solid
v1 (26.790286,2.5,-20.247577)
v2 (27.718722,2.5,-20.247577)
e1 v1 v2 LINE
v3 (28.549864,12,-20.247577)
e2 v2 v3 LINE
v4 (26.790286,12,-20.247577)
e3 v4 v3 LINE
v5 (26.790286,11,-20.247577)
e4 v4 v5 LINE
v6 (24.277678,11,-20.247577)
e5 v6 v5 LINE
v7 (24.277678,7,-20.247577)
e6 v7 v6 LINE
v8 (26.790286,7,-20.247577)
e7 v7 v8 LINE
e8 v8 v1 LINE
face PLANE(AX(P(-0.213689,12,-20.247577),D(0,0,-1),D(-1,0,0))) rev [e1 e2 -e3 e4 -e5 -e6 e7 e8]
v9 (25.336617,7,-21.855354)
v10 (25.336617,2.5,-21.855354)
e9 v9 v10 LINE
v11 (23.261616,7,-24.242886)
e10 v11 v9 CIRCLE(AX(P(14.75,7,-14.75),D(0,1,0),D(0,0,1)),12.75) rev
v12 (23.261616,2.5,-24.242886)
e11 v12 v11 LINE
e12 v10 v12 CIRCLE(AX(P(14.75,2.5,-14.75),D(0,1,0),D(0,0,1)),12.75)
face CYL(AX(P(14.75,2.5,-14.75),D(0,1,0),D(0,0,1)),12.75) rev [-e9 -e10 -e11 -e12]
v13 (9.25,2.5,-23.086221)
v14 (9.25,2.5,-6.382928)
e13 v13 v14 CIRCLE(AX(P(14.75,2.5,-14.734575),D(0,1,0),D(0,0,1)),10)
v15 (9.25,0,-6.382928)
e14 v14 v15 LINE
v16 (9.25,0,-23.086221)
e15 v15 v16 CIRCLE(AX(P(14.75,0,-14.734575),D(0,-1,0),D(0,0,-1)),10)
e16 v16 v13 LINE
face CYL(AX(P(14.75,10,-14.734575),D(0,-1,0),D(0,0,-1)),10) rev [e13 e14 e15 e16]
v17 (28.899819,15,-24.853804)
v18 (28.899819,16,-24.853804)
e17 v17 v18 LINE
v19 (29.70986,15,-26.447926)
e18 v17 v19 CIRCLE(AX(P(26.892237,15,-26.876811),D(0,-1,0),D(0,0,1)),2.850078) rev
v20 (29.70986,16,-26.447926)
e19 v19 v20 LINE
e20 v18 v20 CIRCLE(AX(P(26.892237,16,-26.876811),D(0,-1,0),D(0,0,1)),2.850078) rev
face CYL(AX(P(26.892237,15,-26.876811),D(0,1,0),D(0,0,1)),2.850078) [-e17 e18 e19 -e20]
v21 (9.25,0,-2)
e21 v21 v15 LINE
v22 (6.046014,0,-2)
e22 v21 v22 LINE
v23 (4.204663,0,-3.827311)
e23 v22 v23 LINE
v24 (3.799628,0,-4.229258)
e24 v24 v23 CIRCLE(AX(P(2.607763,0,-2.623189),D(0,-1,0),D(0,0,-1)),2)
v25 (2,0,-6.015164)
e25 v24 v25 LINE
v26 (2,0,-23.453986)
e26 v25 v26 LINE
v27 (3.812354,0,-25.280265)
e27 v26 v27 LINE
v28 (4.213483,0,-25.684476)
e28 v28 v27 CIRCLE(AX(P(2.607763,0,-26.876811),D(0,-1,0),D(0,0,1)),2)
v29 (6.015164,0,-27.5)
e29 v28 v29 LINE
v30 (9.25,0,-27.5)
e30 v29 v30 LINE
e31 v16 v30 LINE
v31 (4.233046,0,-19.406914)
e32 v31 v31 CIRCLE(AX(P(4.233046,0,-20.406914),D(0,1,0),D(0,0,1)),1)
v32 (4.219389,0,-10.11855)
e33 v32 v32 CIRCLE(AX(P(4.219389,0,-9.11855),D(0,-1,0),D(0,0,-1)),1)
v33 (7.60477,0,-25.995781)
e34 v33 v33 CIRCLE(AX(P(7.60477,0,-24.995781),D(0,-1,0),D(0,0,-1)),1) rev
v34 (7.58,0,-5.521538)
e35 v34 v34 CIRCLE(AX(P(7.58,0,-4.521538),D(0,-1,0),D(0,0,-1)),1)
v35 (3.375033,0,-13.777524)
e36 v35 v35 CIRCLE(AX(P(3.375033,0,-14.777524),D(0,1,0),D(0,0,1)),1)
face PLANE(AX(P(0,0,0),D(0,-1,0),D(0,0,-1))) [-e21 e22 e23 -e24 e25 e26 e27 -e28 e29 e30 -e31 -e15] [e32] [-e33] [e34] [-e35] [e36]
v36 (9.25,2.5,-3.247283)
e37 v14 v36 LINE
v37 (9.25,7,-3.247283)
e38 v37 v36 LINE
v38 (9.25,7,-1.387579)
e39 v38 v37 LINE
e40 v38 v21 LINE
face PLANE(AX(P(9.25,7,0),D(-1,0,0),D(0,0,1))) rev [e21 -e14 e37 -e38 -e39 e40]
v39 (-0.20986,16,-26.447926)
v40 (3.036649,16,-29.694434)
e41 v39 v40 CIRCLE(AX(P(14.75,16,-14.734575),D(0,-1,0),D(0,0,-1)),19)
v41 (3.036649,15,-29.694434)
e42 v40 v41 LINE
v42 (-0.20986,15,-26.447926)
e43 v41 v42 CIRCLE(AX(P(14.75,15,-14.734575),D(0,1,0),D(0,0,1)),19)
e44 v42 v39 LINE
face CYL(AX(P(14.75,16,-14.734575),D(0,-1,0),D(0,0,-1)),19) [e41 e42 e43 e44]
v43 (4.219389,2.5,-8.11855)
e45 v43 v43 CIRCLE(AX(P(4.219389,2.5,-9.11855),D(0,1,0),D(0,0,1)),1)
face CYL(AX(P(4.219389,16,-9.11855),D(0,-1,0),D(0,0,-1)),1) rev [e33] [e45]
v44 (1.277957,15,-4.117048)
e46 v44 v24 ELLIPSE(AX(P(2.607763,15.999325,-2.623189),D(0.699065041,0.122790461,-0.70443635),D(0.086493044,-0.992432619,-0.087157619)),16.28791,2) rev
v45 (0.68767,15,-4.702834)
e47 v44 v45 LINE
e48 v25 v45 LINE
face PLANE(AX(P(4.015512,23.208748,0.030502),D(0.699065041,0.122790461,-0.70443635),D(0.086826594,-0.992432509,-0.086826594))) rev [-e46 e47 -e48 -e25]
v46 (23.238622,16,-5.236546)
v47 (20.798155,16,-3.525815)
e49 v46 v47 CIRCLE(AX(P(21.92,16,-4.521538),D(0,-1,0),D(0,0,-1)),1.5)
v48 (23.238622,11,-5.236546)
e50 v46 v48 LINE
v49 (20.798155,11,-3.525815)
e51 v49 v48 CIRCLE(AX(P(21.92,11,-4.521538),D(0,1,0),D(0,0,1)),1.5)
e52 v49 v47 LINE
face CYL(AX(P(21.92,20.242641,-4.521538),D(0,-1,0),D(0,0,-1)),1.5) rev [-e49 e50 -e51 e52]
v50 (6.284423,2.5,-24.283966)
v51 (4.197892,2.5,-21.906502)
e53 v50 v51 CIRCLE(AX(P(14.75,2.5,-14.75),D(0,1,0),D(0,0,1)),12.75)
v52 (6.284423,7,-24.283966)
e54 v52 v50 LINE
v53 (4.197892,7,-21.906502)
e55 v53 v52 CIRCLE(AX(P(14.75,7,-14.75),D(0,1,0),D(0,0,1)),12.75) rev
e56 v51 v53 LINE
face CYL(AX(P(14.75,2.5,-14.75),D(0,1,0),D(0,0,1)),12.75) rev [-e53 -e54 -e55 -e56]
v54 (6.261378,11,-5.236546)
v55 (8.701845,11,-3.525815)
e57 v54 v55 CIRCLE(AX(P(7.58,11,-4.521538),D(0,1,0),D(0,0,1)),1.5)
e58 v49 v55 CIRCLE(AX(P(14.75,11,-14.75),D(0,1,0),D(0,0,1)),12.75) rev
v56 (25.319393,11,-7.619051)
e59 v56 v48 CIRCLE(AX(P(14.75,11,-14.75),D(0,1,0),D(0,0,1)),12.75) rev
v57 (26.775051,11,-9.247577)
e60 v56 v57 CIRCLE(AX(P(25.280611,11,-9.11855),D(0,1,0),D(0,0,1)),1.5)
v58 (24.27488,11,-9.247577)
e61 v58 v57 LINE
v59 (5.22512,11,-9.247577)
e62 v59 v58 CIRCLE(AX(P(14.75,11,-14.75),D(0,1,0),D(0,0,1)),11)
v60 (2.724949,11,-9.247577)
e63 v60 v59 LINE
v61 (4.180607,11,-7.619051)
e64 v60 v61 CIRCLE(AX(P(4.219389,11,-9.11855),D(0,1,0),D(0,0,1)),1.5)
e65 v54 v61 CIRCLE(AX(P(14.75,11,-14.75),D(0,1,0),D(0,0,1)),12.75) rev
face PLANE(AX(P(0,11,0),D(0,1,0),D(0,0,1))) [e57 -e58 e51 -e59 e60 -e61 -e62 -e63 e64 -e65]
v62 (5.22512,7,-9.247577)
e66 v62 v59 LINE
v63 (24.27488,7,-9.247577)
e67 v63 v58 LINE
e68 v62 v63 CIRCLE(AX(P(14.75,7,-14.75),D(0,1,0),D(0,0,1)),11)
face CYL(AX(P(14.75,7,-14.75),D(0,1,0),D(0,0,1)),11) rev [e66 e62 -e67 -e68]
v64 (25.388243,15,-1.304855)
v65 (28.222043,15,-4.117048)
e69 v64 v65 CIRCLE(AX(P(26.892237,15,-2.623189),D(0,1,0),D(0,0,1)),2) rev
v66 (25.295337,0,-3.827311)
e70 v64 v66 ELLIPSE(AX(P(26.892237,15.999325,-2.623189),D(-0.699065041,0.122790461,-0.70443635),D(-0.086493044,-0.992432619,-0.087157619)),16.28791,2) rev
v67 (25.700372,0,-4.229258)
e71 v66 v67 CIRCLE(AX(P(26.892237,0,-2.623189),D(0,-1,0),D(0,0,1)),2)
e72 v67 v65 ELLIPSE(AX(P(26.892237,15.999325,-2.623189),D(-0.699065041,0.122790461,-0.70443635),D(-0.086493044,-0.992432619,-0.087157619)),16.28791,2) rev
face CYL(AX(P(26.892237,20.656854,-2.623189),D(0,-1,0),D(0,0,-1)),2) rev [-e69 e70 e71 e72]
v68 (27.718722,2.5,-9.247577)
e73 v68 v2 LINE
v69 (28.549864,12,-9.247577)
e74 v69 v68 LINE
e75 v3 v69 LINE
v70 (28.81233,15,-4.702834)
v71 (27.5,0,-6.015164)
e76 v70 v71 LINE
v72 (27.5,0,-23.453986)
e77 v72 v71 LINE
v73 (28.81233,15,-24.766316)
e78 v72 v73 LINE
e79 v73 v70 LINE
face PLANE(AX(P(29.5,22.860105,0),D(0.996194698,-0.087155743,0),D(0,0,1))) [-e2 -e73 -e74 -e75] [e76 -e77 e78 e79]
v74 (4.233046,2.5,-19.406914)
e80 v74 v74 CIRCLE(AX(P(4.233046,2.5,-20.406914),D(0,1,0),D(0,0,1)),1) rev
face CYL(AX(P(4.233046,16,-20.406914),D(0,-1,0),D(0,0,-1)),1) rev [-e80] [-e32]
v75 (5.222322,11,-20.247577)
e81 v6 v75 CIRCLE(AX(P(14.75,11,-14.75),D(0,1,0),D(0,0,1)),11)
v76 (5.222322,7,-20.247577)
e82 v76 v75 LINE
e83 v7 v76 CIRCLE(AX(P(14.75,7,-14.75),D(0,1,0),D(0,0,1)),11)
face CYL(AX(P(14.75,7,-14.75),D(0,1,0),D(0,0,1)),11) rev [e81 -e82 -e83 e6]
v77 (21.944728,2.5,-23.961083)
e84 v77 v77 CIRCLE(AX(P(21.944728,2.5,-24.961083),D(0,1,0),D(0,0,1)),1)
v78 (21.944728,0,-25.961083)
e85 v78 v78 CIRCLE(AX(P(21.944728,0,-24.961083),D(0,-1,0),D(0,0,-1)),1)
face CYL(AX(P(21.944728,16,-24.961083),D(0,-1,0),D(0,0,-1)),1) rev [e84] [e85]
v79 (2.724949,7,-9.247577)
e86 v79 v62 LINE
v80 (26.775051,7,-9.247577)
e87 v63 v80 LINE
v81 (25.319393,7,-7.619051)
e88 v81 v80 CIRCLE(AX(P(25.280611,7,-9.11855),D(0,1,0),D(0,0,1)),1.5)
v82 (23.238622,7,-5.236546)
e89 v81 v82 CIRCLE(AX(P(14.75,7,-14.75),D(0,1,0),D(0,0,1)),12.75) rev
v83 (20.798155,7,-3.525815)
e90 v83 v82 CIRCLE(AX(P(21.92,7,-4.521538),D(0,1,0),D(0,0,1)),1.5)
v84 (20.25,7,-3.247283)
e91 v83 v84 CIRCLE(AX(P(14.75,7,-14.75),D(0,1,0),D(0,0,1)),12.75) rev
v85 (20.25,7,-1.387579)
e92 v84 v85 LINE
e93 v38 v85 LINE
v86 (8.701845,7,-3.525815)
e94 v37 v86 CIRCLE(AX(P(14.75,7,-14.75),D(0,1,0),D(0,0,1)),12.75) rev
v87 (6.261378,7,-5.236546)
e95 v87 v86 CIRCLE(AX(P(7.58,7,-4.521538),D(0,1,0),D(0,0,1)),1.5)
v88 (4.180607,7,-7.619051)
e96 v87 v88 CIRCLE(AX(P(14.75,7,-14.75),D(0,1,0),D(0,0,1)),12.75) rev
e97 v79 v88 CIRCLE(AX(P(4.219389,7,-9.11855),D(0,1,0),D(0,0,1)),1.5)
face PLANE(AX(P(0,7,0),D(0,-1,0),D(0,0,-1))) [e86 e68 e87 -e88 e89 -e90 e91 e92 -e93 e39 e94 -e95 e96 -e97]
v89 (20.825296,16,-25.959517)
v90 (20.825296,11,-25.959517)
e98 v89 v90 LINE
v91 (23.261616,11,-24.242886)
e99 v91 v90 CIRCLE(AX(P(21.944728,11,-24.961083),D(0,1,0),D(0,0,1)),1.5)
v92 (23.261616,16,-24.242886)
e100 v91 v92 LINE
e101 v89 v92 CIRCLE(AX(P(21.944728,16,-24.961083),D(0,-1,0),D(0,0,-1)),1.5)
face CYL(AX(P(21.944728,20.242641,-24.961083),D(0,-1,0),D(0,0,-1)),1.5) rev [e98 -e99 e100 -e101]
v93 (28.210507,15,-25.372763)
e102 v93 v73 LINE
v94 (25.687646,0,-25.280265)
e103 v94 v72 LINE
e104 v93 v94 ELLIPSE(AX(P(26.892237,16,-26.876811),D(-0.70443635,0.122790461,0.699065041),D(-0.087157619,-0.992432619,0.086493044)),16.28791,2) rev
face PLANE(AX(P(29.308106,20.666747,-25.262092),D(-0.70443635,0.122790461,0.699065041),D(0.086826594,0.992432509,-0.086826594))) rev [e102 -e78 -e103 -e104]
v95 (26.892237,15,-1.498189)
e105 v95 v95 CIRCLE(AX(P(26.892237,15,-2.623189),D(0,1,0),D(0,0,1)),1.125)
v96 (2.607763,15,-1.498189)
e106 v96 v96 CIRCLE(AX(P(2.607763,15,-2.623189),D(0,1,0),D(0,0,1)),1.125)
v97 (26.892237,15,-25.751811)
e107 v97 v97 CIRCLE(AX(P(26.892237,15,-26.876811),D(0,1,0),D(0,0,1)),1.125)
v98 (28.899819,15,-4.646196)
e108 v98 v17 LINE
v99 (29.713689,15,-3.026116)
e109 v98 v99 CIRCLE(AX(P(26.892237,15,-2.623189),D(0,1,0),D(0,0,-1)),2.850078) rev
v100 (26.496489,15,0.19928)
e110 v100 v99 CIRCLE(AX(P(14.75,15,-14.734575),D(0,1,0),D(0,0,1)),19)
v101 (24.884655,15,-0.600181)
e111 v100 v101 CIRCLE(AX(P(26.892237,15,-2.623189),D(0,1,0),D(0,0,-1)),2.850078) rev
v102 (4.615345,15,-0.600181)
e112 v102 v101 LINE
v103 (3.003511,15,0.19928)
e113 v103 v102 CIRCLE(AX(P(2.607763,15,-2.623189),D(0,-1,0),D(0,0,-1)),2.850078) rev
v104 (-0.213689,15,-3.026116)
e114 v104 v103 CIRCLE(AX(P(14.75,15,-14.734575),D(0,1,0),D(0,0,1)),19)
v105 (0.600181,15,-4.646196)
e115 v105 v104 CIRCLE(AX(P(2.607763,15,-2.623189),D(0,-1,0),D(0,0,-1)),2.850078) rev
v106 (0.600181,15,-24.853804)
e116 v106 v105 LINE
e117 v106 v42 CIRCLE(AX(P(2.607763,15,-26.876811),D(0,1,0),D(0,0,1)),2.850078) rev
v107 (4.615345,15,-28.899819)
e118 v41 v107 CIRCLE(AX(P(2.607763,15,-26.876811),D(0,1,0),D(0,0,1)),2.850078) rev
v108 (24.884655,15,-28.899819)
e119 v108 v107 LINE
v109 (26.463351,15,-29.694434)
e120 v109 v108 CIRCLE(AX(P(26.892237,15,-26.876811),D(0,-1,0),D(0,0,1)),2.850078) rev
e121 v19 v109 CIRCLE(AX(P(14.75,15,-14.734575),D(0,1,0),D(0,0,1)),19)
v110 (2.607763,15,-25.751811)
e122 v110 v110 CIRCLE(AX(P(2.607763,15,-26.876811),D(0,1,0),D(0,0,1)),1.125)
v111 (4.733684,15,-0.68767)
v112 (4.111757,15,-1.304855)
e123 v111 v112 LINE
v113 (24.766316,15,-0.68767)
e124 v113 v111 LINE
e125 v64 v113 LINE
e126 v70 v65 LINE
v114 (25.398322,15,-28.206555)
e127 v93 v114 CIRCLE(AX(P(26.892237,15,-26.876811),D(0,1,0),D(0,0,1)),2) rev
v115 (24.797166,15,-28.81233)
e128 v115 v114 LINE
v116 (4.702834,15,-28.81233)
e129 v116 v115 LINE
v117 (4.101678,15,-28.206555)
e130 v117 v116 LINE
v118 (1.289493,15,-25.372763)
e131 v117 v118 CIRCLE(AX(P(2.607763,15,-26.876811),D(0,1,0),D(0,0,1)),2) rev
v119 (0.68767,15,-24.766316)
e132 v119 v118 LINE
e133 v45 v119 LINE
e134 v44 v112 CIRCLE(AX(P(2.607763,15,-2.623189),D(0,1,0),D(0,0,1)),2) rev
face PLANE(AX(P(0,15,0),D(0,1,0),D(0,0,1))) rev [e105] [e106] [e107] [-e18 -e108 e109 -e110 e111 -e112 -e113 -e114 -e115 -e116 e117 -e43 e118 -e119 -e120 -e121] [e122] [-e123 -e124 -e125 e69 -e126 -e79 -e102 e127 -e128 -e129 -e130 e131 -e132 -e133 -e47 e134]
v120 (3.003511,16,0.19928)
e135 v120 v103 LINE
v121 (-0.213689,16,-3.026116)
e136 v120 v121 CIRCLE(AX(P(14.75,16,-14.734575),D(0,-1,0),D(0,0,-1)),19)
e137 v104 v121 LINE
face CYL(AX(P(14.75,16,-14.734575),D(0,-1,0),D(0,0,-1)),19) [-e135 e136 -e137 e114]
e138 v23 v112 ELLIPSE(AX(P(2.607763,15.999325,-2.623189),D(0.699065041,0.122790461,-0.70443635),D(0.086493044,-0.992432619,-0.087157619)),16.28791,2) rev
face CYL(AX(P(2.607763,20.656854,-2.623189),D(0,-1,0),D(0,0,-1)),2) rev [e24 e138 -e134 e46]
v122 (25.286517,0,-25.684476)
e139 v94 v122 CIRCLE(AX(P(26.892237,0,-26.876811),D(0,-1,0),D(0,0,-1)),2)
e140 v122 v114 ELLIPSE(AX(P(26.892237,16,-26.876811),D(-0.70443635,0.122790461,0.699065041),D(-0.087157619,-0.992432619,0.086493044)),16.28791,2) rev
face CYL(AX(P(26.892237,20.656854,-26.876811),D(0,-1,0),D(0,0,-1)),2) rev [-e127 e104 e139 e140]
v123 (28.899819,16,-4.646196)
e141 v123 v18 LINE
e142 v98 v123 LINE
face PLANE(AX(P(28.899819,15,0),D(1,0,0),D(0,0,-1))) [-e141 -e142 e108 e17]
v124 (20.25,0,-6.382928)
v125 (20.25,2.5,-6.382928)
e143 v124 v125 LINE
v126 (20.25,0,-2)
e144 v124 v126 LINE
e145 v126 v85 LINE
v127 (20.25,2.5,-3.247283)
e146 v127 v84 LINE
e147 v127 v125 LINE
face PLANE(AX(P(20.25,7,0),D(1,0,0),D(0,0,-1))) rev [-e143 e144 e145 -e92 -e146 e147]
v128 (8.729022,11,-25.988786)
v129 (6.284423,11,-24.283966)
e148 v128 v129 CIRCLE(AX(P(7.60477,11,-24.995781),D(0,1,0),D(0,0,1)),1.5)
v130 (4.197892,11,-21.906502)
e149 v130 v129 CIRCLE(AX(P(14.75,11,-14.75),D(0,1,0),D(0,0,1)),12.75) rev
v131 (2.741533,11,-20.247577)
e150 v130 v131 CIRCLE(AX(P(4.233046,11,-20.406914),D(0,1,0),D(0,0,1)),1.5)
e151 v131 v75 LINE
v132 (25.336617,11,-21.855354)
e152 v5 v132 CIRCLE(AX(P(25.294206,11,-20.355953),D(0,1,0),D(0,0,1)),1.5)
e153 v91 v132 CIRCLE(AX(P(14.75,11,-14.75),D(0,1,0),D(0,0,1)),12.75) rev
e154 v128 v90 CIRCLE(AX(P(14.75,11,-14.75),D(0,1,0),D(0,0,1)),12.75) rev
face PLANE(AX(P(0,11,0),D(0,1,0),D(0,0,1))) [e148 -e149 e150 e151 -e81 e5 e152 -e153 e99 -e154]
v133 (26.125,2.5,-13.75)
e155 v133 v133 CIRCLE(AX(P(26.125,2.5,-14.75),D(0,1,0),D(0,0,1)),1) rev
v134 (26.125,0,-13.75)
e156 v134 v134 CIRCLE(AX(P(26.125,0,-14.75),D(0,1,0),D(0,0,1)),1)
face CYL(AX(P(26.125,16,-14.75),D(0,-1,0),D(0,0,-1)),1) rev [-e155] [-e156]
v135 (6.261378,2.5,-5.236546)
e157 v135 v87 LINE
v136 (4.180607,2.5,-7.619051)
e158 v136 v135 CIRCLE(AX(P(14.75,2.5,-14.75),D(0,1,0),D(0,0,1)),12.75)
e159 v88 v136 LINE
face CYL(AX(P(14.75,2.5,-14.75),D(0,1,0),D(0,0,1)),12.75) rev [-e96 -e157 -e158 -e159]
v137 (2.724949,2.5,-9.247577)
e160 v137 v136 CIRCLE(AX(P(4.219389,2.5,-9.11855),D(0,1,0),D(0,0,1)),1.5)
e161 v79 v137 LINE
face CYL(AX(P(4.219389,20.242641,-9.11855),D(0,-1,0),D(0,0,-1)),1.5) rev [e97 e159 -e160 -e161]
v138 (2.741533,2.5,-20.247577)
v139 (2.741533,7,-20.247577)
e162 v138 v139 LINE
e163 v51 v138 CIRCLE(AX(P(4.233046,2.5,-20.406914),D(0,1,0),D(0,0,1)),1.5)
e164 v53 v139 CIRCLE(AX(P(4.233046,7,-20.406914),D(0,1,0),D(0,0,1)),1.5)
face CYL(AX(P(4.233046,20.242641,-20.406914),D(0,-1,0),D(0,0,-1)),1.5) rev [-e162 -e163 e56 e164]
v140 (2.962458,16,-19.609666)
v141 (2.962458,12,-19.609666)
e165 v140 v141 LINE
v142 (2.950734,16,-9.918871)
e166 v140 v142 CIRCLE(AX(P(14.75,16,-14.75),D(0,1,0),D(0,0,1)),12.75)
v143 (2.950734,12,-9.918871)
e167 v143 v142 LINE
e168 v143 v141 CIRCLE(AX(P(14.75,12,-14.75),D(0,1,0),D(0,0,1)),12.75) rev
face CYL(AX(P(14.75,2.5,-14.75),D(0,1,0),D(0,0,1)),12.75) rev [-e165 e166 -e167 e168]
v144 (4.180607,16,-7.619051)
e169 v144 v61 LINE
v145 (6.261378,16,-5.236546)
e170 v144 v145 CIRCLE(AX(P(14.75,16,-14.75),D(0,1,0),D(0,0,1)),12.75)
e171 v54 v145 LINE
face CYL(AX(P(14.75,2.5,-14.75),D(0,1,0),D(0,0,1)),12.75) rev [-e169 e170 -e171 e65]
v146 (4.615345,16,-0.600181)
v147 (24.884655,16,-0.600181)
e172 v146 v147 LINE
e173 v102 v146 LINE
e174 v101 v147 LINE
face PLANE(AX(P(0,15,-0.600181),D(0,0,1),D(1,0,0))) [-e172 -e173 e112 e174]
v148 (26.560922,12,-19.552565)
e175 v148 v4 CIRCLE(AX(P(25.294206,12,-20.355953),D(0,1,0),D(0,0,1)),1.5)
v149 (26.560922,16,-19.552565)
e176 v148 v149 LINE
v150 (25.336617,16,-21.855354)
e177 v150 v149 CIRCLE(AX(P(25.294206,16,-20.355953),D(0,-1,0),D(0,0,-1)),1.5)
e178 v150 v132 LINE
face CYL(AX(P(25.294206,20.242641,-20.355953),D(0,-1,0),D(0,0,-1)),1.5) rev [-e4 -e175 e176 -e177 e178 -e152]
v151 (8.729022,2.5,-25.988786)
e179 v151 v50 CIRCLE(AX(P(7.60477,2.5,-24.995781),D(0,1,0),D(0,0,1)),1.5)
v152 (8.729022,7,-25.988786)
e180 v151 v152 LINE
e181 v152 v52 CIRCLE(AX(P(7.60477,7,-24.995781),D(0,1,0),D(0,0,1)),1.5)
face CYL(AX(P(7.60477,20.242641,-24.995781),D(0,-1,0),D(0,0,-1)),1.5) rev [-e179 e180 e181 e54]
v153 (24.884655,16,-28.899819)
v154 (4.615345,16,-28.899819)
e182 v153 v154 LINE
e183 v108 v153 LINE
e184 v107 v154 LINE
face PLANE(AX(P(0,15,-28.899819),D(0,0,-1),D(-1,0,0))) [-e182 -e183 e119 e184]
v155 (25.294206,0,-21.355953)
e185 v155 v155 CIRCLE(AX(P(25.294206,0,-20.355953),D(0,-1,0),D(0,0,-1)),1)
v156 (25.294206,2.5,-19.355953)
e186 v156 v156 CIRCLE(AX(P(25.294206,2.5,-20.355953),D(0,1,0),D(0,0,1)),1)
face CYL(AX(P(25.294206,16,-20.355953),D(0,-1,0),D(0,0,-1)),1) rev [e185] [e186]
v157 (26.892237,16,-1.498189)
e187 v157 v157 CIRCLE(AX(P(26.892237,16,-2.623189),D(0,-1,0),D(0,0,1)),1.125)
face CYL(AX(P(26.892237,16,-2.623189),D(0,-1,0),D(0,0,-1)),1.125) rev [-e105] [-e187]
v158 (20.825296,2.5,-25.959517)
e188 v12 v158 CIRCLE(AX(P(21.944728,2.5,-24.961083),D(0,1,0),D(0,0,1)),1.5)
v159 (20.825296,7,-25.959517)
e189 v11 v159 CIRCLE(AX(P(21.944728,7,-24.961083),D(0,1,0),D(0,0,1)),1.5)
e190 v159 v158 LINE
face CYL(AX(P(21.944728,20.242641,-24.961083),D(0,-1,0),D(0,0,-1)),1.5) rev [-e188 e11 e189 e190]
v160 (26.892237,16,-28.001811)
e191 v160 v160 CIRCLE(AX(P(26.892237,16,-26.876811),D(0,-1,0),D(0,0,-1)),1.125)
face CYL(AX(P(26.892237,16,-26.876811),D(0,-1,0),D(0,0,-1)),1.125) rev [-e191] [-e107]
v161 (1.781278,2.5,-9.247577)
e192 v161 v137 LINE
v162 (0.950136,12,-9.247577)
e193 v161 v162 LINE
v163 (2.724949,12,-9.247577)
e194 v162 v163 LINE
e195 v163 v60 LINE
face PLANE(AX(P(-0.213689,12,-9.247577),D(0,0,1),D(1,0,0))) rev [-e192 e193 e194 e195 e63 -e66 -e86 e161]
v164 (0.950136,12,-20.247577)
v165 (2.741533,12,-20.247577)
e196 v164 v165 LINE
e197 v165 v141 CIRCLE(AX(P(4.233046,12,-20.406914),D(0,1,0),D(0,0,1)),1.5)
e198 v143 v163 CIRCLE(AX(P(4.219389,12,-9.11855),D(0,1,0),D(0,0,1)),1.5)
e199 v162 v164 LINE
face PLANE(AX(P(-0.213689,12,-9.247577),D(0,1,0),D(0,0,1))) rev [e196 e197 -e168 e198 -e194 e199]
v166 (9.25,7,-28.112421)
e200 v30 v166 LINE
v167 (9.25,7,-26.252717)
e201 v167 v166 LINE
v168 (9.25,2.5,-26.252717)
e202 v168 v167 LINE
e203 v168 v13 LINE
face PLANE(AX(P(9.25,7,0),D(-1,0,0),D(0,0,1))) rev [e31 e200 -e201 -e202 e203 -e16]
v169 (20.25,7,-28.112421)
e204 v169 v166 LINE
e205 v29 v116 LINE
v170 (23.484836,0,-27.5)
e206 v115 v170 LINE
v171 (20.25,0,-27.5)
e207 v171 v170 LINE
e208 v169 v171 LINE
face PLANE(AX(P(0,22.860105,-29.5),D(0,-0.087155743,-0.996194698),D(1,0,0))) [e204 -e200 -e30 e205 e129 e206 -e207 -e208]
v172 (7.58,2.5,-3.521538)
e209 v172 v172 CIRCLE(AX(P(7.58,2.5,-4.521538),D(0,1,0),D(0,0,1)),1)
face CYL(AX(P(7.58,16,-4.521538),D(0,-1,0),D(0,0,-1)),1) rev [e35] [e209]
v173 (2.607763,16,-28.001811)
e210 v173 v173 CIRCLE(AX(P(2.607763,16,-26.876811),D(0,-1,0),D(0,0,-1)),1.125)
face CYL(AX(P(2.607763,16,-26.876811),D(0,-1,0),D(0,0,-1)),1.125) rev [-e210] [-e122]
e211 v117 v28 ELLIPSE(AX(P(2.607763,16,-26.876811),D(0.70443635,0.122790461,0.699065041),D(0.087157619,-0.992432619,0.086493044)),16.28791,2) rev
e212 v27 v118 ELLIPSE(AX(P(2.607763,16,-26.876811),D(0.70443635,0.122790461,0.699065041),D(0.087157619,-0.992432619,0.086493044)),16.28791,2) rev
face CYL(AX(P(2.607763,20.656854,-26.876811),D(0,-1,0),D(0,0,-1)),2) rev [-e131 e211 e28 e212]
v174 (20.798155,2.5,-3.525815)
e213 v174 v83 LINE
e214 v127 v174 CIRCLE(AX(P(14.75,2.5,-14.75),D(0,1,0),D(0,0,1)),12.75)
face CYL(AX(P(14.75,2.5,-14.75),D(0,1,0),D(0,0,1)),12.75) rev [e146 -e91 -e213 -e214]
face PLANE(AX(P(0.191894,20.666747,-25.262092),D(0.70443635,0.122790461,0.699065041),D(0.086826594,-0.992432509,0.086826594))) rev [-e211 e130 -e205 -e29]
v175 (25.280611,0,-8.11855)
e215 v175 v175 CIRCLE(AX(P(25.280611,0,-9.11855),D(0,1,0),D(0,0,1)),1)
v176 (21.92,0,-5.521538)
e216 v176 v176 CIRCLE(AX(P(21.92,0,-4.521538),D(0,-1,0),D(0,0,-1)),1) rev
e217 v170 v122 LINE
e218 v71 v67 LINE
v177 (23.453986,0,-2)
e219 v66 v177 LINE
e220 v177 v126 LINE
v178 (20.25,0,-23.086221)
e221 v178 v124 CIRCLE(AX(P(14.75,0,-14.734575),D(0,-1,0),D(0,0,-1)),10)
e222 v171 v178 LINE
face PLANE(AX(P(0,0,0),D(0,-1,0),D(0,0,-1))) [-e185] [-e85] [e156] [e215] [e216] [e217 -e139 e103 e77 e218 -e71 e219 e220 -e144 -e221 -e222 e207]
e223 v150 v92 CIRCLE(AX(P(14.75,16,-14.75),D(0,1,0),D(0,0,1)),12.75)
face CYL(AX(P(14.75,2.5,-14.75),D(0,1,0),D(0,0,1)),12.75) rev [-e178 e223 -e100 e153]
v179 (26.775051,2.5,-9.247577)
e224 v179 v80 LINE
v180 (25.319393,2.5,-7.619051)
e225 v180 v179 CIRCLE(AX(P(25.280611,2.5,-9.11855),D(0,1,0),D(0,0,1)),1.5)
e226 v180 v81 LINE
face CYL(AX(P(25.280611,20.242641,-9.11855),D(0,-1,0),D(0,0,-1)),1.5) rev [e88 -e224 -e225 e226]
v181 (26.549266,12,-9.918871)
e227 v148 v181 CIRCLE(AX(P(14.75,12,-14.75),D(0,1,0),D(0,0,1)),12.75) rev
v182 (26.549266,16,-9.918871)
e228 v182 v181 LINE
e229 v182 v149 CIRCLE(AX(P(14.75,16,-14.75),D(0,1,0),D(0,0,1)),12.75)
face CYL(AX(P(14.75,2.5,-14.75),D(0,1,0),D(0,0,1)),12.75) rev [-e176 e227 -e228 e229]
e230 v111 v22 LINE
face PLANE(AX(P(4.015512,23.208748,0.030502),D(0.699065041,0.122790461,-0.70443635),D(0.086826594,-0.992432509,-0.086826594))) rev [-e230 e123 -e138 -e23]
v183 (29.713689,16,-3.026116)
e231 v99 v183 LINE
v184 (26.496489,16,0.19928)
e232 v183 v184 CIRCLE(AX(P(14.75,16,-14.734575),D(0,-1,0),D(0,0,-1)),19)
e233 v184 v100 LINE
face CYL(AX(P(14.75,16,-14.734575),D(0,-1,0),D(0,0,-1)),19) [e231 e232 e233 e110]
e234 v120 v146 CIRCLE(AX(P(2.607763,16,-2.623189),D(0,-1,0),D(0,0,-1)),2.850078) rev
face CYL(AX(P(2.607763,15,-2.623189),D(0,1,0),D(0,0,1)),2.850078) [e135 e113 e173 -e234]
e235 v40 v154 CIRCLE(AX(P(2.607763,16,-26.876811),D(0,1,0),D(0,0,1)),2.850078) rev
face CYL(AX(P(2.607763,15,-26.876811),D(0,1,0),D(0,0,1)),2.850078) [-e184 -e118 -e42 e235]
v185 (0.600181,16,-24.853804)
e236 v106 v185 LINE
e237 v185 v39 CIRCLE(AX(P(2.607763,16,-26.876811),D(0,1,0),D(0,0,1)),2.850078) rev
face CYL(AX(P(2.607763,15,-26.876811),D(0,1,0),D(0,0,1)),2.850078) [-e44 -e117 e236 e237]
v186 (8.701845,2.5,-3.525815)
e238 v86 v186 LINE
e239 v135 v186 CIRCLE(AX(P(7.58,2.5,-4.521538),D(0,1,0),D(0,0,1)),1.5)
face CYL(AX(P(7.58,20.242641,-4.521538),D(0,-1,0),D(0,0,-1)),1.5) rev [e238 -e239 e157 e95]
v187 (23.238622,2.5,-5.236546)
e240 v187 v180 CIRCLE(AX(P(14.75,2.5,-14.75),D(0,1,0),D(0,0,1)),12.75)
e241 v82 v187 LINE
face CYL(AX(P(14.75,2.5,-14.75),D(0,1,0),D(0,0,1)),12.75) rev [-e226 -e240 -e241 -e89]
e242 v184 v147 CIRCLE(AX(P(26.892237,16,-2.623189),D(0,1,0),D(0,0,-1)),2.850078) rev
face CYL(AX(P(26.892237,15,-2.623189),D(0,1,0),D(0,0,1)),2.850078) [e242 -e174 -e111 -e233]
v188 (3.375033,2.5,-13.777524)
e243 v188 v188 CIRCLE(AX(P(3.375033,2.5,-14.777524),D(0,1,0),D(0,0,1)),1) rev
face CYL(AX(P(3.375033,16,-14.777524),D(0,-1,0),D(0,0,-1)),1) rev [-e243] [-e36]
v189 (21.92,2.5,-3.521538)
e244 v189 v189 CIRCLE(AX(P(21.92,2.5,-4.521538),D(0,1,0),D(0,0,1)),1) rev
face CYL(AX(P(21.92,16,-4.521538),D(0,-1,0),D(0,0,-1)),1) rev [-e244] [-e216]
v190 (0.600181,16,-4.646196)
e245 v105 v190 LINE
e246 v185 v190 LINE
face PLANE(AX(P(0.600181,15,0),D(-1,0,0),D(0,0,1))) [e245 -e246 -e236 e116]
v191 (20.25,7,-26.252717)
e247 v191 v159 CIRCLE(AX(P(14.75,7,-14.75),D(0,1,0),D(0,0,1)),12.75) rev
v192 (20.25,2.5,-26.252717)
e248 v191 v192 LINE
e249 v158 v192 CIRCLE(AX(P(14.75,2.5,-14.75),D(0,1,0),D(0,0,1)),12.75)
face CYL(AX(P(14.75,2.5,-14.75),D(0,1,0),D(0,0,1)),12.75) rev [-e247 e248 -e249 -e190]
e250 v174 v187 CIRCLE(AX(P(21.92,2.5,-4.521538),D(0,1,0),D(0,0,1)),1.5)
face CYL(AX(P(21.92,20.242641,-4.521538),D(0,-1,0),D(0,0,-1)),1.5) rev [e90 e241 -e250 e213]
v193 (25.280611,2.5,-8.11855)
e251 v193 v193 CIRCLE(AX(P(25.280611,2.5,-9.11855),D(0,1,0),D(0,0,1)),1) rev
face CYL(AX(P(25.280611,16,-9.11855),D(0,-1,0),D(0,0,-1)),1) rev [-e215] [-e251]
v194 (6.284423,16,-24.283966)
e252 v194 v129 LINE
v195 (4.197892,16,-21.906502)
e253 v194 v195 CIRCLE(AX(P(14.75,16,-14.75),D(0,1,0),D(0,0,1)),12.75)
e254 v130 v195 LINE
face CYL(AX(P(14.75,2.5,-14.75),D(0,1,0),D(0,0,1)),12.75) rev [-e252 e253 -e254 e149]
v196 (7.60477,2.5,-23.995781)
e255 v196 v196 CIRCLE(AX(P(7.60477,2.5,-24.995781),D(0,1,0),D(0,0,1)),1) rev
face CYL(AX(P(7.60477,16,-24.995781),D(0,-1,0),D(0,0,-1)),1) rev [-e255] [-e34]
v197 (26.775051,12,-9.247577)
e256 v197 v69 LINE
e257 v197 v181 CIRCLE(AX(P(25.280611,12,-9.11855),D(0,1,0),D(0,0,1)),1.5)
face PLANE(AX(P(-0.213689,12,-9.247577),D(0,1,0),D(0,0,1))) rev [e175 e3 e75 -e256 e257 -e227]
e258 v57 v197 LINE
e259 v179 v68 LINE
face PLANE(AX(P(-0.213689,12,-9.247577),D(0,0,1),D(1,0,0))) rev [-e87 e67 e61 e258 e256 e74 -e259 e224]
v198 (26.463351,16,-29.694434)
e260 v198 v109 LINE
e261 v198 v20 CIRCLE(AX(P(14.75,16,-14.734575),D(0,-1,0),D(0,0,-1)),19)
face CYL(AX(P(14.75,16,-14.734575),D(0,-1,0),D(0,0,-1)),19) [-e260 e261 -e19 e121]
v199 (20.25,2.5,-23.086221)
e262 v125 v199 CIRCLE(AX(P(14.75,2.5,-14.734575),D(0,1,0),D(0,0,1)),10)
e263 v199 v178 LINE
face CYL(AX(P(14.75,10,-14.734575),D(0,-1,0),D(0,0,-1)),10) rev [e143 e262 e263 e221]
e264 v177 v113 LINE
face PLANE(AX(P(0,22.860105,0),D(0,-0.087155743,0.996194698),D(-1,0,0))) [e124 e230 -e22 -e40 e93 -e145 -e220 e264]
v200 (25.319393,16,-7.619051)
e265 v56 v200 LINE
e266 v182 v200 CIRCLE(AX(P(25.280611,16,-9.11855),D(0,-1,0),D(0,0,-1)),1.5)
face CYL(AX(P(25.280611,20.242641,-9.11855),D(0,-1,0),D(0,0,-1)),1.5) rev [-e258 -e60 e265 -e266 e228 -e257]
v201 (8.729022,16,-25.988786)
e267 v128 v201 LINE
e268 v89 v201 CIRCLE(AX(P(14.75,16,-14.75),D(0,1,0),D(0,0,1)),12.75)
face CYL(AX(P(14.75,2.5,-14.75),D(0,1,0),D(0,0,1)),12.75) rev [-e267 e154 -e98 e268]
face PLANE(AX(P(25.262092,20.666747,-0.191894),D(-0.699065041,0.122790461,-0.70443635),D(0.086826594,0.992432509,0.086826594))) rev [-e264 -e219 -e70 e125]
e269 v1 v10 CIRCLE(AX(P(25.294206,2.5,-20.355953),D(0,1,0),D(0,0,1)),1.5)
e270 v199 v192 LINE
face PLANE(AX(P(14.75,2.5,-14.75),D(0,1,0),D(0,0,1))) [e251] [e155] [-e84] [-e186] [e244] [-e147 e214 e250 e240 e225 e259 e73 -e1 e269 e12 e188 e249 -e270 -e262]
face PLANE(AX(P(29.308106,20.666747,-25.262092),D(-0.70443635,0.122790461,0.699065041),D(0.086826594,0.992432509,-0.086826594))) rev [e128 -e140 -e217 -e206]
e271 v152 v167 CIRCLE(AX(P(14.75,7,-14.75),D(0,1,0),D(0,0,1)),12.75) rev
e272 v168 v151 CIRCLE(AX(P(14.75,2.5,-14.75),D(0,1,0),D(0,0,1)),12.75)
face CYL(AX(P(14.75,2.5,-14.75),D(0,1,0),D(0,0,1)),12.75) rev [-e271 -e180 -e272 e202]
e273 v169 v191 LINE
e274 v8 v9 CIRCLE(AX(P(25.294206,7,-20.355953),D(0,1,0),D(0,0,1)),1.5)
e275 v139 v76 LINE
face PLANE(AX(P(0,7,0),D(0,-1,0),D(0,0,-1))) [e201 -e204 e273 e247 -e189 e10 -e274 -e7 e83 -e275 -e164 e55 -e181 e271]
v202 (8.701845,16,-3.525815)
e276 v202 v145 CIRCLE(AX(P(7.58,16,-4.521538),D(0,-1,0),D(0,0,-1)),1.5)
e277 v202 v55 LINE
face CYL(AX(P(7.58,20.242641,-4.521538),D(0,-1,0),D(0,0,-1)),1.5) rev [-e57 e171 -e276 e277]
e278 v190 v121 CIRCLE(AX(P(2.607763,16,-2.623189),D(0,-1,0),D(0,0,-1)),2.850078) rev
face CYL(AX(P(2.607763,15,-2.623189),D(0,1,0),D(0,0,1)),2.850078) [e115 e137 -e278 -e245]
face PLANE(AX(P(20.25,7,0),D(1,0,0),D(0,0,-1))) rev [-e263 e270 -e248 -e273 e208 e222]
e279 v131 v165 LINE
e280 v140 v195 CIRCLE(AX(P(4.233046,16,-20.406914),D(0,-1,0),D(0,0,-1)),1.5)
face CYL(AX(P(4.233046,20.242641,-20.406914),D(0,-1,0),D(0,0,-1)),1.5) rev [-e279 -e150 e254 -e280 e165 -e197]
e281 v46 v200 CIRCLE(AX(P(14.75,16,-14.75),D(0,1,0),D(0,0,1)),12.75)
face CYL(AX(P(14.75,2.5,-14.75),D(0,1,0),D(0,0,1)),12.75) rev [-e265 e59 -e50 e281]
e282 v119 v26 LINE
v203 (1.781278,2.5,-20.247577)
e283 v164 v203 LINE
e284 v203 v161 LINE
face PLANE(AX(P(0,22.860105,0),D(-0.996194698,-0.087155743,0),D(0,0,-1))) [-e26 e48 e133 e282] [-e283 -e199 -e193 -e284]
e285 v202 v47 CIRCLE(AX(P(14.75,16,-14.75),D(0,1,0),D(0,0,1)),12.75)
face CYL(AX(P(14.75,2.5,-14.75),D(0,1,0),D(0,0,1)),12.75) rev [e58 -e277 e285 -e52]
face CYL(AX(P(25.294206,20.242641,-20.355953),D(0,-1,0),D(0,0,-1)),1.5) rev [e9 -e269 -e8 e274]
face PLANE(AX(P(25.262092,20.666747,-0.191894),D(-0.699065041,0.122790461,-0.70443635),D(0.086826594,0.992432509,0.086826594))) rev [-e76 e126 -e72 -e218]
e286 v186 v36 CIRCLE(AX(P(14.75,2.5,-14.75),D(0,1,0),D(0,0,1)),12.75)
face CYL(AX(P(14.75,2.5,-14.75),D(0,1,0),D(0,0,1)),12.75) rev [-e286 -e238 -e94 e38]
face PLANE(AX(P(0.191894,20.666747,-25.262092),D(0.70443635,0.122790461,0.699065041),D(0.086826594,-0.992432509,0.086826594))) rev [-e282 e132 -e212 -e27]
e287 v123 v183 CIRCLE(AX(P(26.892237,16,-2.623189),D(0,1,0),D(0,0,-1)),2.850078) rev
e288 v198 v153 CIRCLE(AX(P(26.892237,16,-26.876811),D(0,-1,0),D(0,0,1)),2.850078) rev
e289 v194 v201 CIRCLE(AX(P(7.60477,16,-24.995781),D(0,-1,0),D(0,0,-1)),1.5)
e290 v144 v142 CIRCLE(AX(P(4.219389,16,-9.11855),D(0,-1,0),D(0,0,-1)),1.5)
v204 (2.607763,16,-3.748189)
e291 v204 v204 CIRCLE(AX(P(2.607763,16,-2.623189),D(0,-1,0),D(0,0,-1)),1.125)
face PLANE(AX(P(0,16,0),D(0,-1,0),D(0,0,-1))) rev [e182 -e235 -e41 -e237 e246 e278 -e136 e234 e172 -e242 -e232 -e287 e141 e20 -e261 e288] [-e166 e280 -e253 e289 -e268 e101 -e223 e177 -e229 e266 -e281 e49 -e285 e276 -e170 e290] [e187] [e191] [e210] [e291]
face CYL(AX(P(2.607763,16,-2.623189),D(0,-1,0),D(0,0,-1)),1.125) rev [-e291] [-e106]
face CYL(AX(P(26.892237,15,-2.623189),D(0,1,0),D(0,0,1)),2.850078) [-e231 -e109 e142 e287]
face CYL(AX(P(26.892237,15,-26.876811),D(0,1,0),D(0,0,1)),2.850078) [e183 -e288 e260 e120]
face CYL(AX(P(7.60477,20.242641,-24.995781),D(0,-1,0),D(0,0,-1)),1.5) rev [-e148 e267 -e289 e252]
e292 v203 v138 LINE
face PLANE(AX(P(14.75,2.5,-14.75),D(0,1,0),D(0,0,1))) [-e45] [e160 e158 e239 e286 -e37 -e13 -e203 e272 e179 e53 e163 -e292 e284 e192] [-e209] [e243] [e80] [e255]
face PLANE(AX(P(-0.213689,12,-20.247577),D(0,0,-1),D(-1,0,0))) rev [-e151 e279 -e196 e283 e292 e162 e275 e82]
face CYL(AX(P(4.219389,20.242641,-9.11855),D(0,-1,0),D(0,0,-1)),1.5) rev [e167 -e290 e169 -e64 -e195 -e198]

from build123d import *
from OCP.BRepFilletAPI import BRepFilletAPI_MakeChamfer

# Parameters (mm, degrees)
SKETCH1_W               = 29.5
SKETCH1_H               = 29.5
BOSS_EXTRUDE1_DEPTH     = 16
SKETCH2_R               = 12.75
CUT_EXTRUDE1_DEPTH      = 13.5
CHAMFER1_SIZE           = 22.860104606
CHAMFER1_SIZE_2         = 2
CHAMFER2_SIZE           = 4
CHAMFER2_SIZE2          = 4.030734246
SKETCH5_R               = 10
CUT_EXTRUDE2_DEPTH      = 10
BOSS_EXTRUDE2_START     = -1
BOSS_EXTRUDE2_DEPTH     = 1
MIRROR2_START           = -1
MIRROR2_COPY_1_DEPTH    = 1
CUT_EXTRUDE3_DEPTH      = 45.646312331
CUT_EXTRUDE3_DEPTH_BACK = 45.646312331
SKETCH7_R               = 1.125
SKETCH8_R               = 1
CUT_EXTRUDE4_DEPTH      = 45.992146034
SKETCH17_R              = 1.5
CUT_EXTRUDE12_DEPTH     = 13.5
SKETCH11_OUTSIDE_W      = 41.044
SKETCH11_OUTSIDE_H      = 41.014
SKETCH11_OUTSIDE_R      = 19
CUT_EXTRUDE6_DEPTH      = 45.992146034
SKETCH12_R              = 2
CUT_EXTRUDE7_DEPTH      = 15
SKETCH13_W              = 11
SKETCH13_H              = 30.855989766
CUT_EXTRUDE8_DEPTH      = 7
CUT_EXTRUDE9_DEPTH      = 45.557331201
CUT_EXTRUDE9_DEPTH_BACK = 45.557331201
SKETCH14_W              = 11
SKETCH14_H              = 9.5
BOSS_EXTRUDE4_START     = -4
BOSS_EXTRUDE4_DEPTH     = 4


with BuildPart() as part:
    # Sketch1 → Boss-Extrude1 (new body)
    with BuildSketch(Plane(origin=(0, 0, 0), x_dir=(1, 0, 0), z_dir=(0, 1, 0))):
        with Locations((14.75, 14.75)):
            Rectangle(SKETCH1_W, SKETCH1_H)
    extrude(amount=BOSS_EXTRUDE1_DEPTH)

    # Sketch2 → Cut-Extrude1 (cut)
    with BuildSketch(Plane(origin=(0, 16, 0), x_dir=(1, 0, 0), z_dir=(0, 1, 0))):
        with Locations(Location((14.75, 14.75, 0), (0, 0, 270))):
            Circle(SKETCH2_R)
    extrude(amount=-CUT_EXTRUDE1_DEPTH, mode=Mode.SUBTRACT)

    # Chamfer1
    # the kernel refuses this chamfer: 22.860104606, 2 mm, written as the material it takes off along each edge
    with BuildSketch(Plane(origin=(-59.427907001, 0, 0), x_dir=(0, 1, 0), z_dir=(1, 0, 0)), Plane(origin=(29.5, 0, 59.427907001), x_dir=(0, 1, 0), z_dir=(0, 0, -1)), Plane(origin=(0, 0, -88.927907001), x_dir=(0, 1, 0), z_dir=(0, 0, 1))) as chamfer1_piece_1:
        Polygon((CHAMFER1_SIZE, 0), (0, -CHAMFER1_SIZE_2), (0, 0), align=None)
    extrude(amount=148.355814002, mode=Mode.SUBTRACT)
    with BuildSketch(Plane(origin=(88.927907001, 0, -29.5), x_dir=(0, 0, 1), z_dir=(-1, 0, 0))) as chamfer1_piece_2:
        Polygon((CHAMFER1_SIZE_2, 0), (0, CHAMFER1_SIZE), (0, 0), align=None)
    extrude(amount=148.355814002, mode=Mode.SUBTRACT)

    # Chamfer2: one chamfer whose edges measure the first distance from different faces: ONE call of the kernel's chamfer builder (chamfer() names one face for all edges)
    chamfer2_edges_1 = [part.edges().sort_by_distance(p)[0] for p in [
        (1.300090692, 8, -28.199909308),
        (28.199909308, 8, -28.199909308),
    ]]
    chamfer2_side_1 = [part.faces().sort_by_distance(p)[0] for p in [
        (14.75, 8.13876858, -28.212049986),
    ]]
    chamfer2_edges_2 = [part.edges().sort_by_distance(p)[0] for p in [
        (1.300090692, 8, -1.300090692),
    ]]
    chamfer2_side_2 = [part.faces().sort_by_distance(p)[0] for p in [
        (1.287950014, 8.13876858, -14.75),
    ]]
    chamfer2_edges_3 = [part.edges().sort_by_distance(p)[0] for p in [
        (28.199909308, 8, -1.300090692),
    ]]
    chamfer2_side_3 = [part.faces().sort_by_distance(p)[0] for p in [
        (28.212049986, 8.13876858, -14.75),
    ]]
    chamfer2 = BRepFilletAPI_MakeChamfer(part.part.solid().wrapped)
    for e in chamfer2_edges_1:
        chamfer2.Add(CHAMFER2_SIZE, CHAMFER2_SIZE2, e.wrapped, chamfer2_side_1[0].wrapped)  # the first distance lies on this face
    for e in chamfer2_edges_2:
        chamfer2.Add(CHAMFER2_SIZE, CHAMFER2_SIZE2, e.wrapped, chamfer2_side_2[0].wrapped)  # the first distance lies on this face
    for e in chamfer2_edges_3:
        chamfer2.Add(CHAMFER2_SIZE, CHAMFER2_SIZE2, e.wrapped, chamfer2_side_3[0].wrapped)  # the first distance lies on this face
    add(Compound.cast(chamfer2.Shape()), mode=Mode.REPLACE)

    # Sketch5 → Cut-Extrude2 (cut)
    with BuildSketch(Plane.XZ):
        with Locations(Location((14.75, -14.734574622, 0), (0, 0, 270))):
            Circle(SKETCH5_R)
    extrude(amount=-CUT_EXTRUDE2_DEPTH, mode=Mode.SUBTRACT)

    # Boss-Extrude2: read off the stored shape, not the designer's step
    # Boss-Extrude2 outline → Boss-Extrude2 (add)
    with BuildSketch(Plane(origin=(0, 16, 0), x_dir=(1, 0, 0), z_dir=(0, 1, 0)).offset(BOSS_EXTRUDE2_START)):
        with BuildLine():
            Line((0.600181384, 4.615344889), (4.646195644, 0.600181384))
            Line((4.646195644, 0.600181384), (24.853804356, 0.600181384))
            Line((24.853804356, 0.600181384), (28.899818616, 4.615344889))
            Line((28.899818616, 4.615344889), (28.899818616, 24.853804356))
            Line((28.899818616, 24.853804356), (24.884655111, 28.899818616))
            Line((24.884655111, 28.899818616), (4.615344889, 28.899818616))
            ThreePointArc((4.615344889, 28.899818616), (0.584756006, 28.884393239), (0.600181384, 24.853804356))
            Line((0.600181384, 24.853804356), (0.600181384, 4.615344889))
        make_face()
        Polygon((24.797166447, 28.812329953), (28.812329953, 24.766315692), (28.812329953, 4.702833553), (24.766315692, 0.687670047), (4.733684308, 0.687670047), (0.687670047, 4.702833553), (0.687670047, 24.766315692), (4.702833553, 28.812329953), align=None, mode=Mode.SUBTRACT)
    boss_extrude2 = extrude(amount=BOSS_EXTRUDE2_DEPTH)

    # Mirror1: Boss-Extrude2 across plane
    add(boss_extrude2.mirror(Plane(origin=(14.75, 0, 0), x_dir=(0, 0, 1), z_dir=(1, 0, 0))))

    # Mirror2: Boss-Extrude2 across plane
    add(boss_extrude2.mirror(Plane.XY.offset(-14.75)))

    # Mirror2 copy 1 sketch → Mirror2 copy 1 (add)
    with BuildSketch(Plane(origin=(29.5, 16, -29.5), x_dir=(-1, 0, 0), z_dir=(0, 1, 0)).offset(MIRROR2_START)):
        with BuildLine():
            Line((0.600181384, 4.615344889), (4.646195644, 0.600181384))
            Line((4.646195644, 0.600181384), (24.853804356, 0.600181384))
            Line((24.853804356, 0.600181384), (28.899818616, 4.615344889))
            Line((28.899818616, 4.615344889), (28.899818616, 24.853804356))
            Line((28.899818616, 24.853804356), (24.884655111, 28.899818616))
            Line((24.884655111, 28.899818616), (4.615344889, 28.899818616))
            ThreePointArc((4.615344889, 28.899818616), (0.584756006, 28.884393239), (0.600181384, 24.853804356))
            Line((0.600181384, 24.853804356), (0.600181384, 4.615344889))
        make_face()
        Polygon((24.797166447, 28.812329953), (28.812329953, 24.766315692), (28.812329953, 4.702833553), (24.766315692, 0.687670047), (4.733684308, 0.687670047), (0.687670047, 4.702833553), (0.687670047, 24.766315692), (4.702833553, 28.812329953), align=None, mode=Mode.SUBTRACT)
    extrude(amount=MIRROR2_COPY_1_DEPTH)

    # Sketch7 → Cut-Extrude3 (cut, two sides: drawn at the far end of the back side and taken through both)
    with BuildSketch(Plane.XZ.offset(-15).offset(-CUT_EXTRUDE3_DEPTH_BACK)):
        with Locations(Location((2.607763136, -2.623188514, 0), (0, 0, 270))):
            Circle(SKETCH7_R)
        with Locations(Location((26.892236864, -2.623188514, 0), (0, 0, 308.909428046))):
            Circle(SKETCH7_R)
        with Locations(Location((26.892236864, -26.876811486, 0), (0, 0, 270))):
            Circle(SKETCH7_R)
        with Locations(Location((2.607763136, -26.876811486, 0), (0, 0, 270))):
            Circle(SKETCH7_R)
    extrude(amount=CUT_EXTRUDE3_DEPTH + CUT_EXTRUDE3_DEPTH_BACK, mode=Mode.SUBTRACT)

    # Sketch8 → Cut-Extrude4 (cut, through all)
    with BuildSketch(Plane.XZ):
        with Locations(Location((7.58, -4.521537889, 0), (0, 0, 270))):
            Circle(SKETCH8_R)
        with Locations(Location((4.219388969, -9.118549755, 0), (0, 0, 270))):
            Circle(SKETCH8_R)
        with Locations(Location((7.604770426, -24.995781156, 0), (0, 0, 270))):
            Circle(SKETCH8_R)
        with Locations(Location((21.944728448, -24.96108318, 0), (0, 0, 270))):
            Circle(SKETCH8_R)
        with Locations(Location((25.294206418, -20.355953224, 0), (0, 0, 270))):
            Circle(SKETCH8_R)
        with Locations(Location((21.92, -4.521537889, 0), (0, 0, 270))):
            Circle(SKETCH8_R)
        with Locations(Location((3.375033299, -14.777523673, 0), (0, 0, 90))):
            Circle(SKETCH8_R)
        with Locations(Location((4.233046011, -20.406914295, 0), (0, 0, 245.746224718))):
            Circle(SKETCH8_R)
        with Locations(Location((26.125, -14.75, 0), (0, 0, 90))):
            Circle(SKETCH8_R)
        with Locations(Location((25.280611031, -9.118549755, 0), (0, 0, 350.665442319))):
            Circle(SKETCH8_R)
    extrude(amount=-CUT_EXTRUDE4_DEPTH, mode=Mode.SUBTRACT)

    # Sketch17 → Cut-Extrude12 (cut)
    with BuildSketch(Plane(origin=(0, 2.5, 0), x_dir=(1, 0, 0), z_dir=(0, 1, 0))):
        with Locations((7.604770426, 24.995781156)):
            Circle(SKETCH17_R)
        with Locations((4.233046011, 20.406914295)):
            Circle(SKETCH17_R)
        with Locations((4.219388969, 9.118549755)):
            Circle(SKETCH17_R)
        with Locations((7.58, 4.521537889)):
            Circle(SKETCH17_R)
        with Locations((21.92, 4.521537889)):
            Circle(SKETCH17_R)
        with Locations((25.280611031, 9.118549755)):
            Circle(SKETCH17_R)
        with Locations((25.294206418, 20.355953224)):
            Circle(SKETCH17_R)
        with Locations((21.944728448, 24.96108318)):
            Circle(SKETCH17_R)
    extrude(amount=CUT_EXTRUDE12_DEPTH, mode=Mode.SUBTRACT)

    # Sketch11 outside → Cut-Extrude6 (cut, through all)
    with BuildSketch(Plane.XZ):
        with Locations((14.75, -14.75)):
            Rectangle(SKETCH11_OUTSIDE_W, SKETCH11_OUTSIDE_H)
        with Locations((14.75, -14.734574622)):
            Circle(SKETCH11_OUTSIDE_R, mode=Mode.SUBTRACT)
    extrude(amount=-CUT_EXTRUDE6_DEPTH, mode=Mode.SUBTRACT)

    # Sketch12 → Cut-Extrude7 (cut)
    with BuildSketch(Plane.XZ):
        with Locations((2.607763136, -2.623188514)):
            Circle(SKETCH12_R)
        with Locations((26.892236864, -2.623188514)):
            Circle(SKETCH12_R)
        with Locations((26.892236864, -26.876811486)):
            Circle(SKETCH12_R)
        with Locations((2.607763136, -26.876811486)):
            Circle(SKETCH12_R)
    extrude(amount=-CUT_EXTRUDE7_DEPTH, mode=Mode.SUBTRACT)

    # Sketch13 → Cut-Extrude8 (cut)
    with BuildSketch(Plane.XZ):
        with Locations((14.75, -15.427994883)):
            Rectangle(SKETCH13_W, SKETCH13_H)
    extrude(amount=-CUT_EXTRUDE8_DEPTH, mode=Mode.SUBTRACT)

    # Sketch14 → Cut-Extrude9 (cut, two sides: drawn at the far end of the back side and taken through both)
    with BuildSketch(Plane(origin=(0.600181384, 0, 0), x_dir=(0, 0, -1), z_dir=(1, 0, 0)).offset(-CUT_EXTRUDE9_DEPTH_BACK)):
        with Locations((14.747577474, 7.25)):
            Rectangle(SKETCH14_W, SKETCH14_H)
    extrude(amount=CUT_EXTRUDE9_DEPTH + CUT_EXTRUDE9_DEPTH_BACK, mode=Mode.SUBTRACT)

    # Boss-Extrude4: read off the stored shape, not the designer's step
    # Boss-Extrude4 outline → Boss-Extrude4 (add)
    with BuildSketch(Plane(origin=(0, 11, 0), x_dir=(1, 0, 0), z_dir=(0, 1, 0)).offset(BOSS_EXTRUDE4_START)):
        with BuildLine():
            Line((26.775051343, 9.247577474), (24.274880385, 9.247577474))
            ThreePointArc((24.274880385, 9.247577474), (14.75, 3.75), (5.225119615, 9.247577474))
            Line((5.225119615, 9.247577474), (2.724948657, 9.247577474))
            ThreePointArc((2.724948657, 9.247577474), (3.101034316, 8.118908385), (4.18060697, 7.619051187))
            ThreePointArc((4.18060697, 7.619051187), (5.146820144, 6.363019814), (6.261378349, 5.236546239))
            ThreePointArc((6.261378349, 5.236546239), (6.718994568, 3.293258749), (8.701845126, 3.52581528))
            ThreePointArc((8.701845126, 3.52581528), (14.75, 2), (20.798154874, 3.52581528))
            ThreePointArc((20.798154874, 3.52581528), (22.781005432, 3.293258749), (23.238621651, 5.236546239))
            ThreePointArc((23.238621651, 5.236546239), (24.353179856, 6.363019814), (25.31939303, 7.619051187))
            ThreePointArc((25.31939303, 7.619051187), (26.398965684, 8.118908385), (26.775051343, 9.247577474))
        make_face()
        with BuildLine():
            Line((24.277677677, 20.247577474), (26.790286194, 20.247577474))
            ThreePointArc((26.790286194, 20.247577474), (26.406849135, 21.361948346), (25.336616586, 21.855353563))
            ThreePointArc((25.336616586, 21.855353563), (24.373445414, 23.11371917), (23.261616159, 24.242886303))
            ThreePointArc((23.261616159, 24.242886303), (22.808703381, 26.187275382), (20.825295919, 25.959517362))
            ThreePointArc((20.825295919, 25.959517362), (14.78085071, 27.499962676), (8.729021582, 25.988786362))
            ThreePointArc((8.729021582, 25.988786362), (6.746739537, 26.226140044), (6.284422555, 24.28396552))
            ThreePointArc((6.284422555, 24.28396552), (5.167141926, 23.160192099), (4.197892408, 21.906502313))
            ThreePointArc((4.197892408, 21.906502313), (3.105798999, 21.396517333), (2.74153276, 20.247577474))
            Line((2.74153276, 20.247577474), (5.222322323, 20.247577474))
            ThreePointArc((5.222322323, 20.247577474), (14.75, 25.75), (24.277677677, 20.247577474))
        make_face()
    extrude(amount=BOSS_EXTRUDE4_DEPTH)


solid = part.part
